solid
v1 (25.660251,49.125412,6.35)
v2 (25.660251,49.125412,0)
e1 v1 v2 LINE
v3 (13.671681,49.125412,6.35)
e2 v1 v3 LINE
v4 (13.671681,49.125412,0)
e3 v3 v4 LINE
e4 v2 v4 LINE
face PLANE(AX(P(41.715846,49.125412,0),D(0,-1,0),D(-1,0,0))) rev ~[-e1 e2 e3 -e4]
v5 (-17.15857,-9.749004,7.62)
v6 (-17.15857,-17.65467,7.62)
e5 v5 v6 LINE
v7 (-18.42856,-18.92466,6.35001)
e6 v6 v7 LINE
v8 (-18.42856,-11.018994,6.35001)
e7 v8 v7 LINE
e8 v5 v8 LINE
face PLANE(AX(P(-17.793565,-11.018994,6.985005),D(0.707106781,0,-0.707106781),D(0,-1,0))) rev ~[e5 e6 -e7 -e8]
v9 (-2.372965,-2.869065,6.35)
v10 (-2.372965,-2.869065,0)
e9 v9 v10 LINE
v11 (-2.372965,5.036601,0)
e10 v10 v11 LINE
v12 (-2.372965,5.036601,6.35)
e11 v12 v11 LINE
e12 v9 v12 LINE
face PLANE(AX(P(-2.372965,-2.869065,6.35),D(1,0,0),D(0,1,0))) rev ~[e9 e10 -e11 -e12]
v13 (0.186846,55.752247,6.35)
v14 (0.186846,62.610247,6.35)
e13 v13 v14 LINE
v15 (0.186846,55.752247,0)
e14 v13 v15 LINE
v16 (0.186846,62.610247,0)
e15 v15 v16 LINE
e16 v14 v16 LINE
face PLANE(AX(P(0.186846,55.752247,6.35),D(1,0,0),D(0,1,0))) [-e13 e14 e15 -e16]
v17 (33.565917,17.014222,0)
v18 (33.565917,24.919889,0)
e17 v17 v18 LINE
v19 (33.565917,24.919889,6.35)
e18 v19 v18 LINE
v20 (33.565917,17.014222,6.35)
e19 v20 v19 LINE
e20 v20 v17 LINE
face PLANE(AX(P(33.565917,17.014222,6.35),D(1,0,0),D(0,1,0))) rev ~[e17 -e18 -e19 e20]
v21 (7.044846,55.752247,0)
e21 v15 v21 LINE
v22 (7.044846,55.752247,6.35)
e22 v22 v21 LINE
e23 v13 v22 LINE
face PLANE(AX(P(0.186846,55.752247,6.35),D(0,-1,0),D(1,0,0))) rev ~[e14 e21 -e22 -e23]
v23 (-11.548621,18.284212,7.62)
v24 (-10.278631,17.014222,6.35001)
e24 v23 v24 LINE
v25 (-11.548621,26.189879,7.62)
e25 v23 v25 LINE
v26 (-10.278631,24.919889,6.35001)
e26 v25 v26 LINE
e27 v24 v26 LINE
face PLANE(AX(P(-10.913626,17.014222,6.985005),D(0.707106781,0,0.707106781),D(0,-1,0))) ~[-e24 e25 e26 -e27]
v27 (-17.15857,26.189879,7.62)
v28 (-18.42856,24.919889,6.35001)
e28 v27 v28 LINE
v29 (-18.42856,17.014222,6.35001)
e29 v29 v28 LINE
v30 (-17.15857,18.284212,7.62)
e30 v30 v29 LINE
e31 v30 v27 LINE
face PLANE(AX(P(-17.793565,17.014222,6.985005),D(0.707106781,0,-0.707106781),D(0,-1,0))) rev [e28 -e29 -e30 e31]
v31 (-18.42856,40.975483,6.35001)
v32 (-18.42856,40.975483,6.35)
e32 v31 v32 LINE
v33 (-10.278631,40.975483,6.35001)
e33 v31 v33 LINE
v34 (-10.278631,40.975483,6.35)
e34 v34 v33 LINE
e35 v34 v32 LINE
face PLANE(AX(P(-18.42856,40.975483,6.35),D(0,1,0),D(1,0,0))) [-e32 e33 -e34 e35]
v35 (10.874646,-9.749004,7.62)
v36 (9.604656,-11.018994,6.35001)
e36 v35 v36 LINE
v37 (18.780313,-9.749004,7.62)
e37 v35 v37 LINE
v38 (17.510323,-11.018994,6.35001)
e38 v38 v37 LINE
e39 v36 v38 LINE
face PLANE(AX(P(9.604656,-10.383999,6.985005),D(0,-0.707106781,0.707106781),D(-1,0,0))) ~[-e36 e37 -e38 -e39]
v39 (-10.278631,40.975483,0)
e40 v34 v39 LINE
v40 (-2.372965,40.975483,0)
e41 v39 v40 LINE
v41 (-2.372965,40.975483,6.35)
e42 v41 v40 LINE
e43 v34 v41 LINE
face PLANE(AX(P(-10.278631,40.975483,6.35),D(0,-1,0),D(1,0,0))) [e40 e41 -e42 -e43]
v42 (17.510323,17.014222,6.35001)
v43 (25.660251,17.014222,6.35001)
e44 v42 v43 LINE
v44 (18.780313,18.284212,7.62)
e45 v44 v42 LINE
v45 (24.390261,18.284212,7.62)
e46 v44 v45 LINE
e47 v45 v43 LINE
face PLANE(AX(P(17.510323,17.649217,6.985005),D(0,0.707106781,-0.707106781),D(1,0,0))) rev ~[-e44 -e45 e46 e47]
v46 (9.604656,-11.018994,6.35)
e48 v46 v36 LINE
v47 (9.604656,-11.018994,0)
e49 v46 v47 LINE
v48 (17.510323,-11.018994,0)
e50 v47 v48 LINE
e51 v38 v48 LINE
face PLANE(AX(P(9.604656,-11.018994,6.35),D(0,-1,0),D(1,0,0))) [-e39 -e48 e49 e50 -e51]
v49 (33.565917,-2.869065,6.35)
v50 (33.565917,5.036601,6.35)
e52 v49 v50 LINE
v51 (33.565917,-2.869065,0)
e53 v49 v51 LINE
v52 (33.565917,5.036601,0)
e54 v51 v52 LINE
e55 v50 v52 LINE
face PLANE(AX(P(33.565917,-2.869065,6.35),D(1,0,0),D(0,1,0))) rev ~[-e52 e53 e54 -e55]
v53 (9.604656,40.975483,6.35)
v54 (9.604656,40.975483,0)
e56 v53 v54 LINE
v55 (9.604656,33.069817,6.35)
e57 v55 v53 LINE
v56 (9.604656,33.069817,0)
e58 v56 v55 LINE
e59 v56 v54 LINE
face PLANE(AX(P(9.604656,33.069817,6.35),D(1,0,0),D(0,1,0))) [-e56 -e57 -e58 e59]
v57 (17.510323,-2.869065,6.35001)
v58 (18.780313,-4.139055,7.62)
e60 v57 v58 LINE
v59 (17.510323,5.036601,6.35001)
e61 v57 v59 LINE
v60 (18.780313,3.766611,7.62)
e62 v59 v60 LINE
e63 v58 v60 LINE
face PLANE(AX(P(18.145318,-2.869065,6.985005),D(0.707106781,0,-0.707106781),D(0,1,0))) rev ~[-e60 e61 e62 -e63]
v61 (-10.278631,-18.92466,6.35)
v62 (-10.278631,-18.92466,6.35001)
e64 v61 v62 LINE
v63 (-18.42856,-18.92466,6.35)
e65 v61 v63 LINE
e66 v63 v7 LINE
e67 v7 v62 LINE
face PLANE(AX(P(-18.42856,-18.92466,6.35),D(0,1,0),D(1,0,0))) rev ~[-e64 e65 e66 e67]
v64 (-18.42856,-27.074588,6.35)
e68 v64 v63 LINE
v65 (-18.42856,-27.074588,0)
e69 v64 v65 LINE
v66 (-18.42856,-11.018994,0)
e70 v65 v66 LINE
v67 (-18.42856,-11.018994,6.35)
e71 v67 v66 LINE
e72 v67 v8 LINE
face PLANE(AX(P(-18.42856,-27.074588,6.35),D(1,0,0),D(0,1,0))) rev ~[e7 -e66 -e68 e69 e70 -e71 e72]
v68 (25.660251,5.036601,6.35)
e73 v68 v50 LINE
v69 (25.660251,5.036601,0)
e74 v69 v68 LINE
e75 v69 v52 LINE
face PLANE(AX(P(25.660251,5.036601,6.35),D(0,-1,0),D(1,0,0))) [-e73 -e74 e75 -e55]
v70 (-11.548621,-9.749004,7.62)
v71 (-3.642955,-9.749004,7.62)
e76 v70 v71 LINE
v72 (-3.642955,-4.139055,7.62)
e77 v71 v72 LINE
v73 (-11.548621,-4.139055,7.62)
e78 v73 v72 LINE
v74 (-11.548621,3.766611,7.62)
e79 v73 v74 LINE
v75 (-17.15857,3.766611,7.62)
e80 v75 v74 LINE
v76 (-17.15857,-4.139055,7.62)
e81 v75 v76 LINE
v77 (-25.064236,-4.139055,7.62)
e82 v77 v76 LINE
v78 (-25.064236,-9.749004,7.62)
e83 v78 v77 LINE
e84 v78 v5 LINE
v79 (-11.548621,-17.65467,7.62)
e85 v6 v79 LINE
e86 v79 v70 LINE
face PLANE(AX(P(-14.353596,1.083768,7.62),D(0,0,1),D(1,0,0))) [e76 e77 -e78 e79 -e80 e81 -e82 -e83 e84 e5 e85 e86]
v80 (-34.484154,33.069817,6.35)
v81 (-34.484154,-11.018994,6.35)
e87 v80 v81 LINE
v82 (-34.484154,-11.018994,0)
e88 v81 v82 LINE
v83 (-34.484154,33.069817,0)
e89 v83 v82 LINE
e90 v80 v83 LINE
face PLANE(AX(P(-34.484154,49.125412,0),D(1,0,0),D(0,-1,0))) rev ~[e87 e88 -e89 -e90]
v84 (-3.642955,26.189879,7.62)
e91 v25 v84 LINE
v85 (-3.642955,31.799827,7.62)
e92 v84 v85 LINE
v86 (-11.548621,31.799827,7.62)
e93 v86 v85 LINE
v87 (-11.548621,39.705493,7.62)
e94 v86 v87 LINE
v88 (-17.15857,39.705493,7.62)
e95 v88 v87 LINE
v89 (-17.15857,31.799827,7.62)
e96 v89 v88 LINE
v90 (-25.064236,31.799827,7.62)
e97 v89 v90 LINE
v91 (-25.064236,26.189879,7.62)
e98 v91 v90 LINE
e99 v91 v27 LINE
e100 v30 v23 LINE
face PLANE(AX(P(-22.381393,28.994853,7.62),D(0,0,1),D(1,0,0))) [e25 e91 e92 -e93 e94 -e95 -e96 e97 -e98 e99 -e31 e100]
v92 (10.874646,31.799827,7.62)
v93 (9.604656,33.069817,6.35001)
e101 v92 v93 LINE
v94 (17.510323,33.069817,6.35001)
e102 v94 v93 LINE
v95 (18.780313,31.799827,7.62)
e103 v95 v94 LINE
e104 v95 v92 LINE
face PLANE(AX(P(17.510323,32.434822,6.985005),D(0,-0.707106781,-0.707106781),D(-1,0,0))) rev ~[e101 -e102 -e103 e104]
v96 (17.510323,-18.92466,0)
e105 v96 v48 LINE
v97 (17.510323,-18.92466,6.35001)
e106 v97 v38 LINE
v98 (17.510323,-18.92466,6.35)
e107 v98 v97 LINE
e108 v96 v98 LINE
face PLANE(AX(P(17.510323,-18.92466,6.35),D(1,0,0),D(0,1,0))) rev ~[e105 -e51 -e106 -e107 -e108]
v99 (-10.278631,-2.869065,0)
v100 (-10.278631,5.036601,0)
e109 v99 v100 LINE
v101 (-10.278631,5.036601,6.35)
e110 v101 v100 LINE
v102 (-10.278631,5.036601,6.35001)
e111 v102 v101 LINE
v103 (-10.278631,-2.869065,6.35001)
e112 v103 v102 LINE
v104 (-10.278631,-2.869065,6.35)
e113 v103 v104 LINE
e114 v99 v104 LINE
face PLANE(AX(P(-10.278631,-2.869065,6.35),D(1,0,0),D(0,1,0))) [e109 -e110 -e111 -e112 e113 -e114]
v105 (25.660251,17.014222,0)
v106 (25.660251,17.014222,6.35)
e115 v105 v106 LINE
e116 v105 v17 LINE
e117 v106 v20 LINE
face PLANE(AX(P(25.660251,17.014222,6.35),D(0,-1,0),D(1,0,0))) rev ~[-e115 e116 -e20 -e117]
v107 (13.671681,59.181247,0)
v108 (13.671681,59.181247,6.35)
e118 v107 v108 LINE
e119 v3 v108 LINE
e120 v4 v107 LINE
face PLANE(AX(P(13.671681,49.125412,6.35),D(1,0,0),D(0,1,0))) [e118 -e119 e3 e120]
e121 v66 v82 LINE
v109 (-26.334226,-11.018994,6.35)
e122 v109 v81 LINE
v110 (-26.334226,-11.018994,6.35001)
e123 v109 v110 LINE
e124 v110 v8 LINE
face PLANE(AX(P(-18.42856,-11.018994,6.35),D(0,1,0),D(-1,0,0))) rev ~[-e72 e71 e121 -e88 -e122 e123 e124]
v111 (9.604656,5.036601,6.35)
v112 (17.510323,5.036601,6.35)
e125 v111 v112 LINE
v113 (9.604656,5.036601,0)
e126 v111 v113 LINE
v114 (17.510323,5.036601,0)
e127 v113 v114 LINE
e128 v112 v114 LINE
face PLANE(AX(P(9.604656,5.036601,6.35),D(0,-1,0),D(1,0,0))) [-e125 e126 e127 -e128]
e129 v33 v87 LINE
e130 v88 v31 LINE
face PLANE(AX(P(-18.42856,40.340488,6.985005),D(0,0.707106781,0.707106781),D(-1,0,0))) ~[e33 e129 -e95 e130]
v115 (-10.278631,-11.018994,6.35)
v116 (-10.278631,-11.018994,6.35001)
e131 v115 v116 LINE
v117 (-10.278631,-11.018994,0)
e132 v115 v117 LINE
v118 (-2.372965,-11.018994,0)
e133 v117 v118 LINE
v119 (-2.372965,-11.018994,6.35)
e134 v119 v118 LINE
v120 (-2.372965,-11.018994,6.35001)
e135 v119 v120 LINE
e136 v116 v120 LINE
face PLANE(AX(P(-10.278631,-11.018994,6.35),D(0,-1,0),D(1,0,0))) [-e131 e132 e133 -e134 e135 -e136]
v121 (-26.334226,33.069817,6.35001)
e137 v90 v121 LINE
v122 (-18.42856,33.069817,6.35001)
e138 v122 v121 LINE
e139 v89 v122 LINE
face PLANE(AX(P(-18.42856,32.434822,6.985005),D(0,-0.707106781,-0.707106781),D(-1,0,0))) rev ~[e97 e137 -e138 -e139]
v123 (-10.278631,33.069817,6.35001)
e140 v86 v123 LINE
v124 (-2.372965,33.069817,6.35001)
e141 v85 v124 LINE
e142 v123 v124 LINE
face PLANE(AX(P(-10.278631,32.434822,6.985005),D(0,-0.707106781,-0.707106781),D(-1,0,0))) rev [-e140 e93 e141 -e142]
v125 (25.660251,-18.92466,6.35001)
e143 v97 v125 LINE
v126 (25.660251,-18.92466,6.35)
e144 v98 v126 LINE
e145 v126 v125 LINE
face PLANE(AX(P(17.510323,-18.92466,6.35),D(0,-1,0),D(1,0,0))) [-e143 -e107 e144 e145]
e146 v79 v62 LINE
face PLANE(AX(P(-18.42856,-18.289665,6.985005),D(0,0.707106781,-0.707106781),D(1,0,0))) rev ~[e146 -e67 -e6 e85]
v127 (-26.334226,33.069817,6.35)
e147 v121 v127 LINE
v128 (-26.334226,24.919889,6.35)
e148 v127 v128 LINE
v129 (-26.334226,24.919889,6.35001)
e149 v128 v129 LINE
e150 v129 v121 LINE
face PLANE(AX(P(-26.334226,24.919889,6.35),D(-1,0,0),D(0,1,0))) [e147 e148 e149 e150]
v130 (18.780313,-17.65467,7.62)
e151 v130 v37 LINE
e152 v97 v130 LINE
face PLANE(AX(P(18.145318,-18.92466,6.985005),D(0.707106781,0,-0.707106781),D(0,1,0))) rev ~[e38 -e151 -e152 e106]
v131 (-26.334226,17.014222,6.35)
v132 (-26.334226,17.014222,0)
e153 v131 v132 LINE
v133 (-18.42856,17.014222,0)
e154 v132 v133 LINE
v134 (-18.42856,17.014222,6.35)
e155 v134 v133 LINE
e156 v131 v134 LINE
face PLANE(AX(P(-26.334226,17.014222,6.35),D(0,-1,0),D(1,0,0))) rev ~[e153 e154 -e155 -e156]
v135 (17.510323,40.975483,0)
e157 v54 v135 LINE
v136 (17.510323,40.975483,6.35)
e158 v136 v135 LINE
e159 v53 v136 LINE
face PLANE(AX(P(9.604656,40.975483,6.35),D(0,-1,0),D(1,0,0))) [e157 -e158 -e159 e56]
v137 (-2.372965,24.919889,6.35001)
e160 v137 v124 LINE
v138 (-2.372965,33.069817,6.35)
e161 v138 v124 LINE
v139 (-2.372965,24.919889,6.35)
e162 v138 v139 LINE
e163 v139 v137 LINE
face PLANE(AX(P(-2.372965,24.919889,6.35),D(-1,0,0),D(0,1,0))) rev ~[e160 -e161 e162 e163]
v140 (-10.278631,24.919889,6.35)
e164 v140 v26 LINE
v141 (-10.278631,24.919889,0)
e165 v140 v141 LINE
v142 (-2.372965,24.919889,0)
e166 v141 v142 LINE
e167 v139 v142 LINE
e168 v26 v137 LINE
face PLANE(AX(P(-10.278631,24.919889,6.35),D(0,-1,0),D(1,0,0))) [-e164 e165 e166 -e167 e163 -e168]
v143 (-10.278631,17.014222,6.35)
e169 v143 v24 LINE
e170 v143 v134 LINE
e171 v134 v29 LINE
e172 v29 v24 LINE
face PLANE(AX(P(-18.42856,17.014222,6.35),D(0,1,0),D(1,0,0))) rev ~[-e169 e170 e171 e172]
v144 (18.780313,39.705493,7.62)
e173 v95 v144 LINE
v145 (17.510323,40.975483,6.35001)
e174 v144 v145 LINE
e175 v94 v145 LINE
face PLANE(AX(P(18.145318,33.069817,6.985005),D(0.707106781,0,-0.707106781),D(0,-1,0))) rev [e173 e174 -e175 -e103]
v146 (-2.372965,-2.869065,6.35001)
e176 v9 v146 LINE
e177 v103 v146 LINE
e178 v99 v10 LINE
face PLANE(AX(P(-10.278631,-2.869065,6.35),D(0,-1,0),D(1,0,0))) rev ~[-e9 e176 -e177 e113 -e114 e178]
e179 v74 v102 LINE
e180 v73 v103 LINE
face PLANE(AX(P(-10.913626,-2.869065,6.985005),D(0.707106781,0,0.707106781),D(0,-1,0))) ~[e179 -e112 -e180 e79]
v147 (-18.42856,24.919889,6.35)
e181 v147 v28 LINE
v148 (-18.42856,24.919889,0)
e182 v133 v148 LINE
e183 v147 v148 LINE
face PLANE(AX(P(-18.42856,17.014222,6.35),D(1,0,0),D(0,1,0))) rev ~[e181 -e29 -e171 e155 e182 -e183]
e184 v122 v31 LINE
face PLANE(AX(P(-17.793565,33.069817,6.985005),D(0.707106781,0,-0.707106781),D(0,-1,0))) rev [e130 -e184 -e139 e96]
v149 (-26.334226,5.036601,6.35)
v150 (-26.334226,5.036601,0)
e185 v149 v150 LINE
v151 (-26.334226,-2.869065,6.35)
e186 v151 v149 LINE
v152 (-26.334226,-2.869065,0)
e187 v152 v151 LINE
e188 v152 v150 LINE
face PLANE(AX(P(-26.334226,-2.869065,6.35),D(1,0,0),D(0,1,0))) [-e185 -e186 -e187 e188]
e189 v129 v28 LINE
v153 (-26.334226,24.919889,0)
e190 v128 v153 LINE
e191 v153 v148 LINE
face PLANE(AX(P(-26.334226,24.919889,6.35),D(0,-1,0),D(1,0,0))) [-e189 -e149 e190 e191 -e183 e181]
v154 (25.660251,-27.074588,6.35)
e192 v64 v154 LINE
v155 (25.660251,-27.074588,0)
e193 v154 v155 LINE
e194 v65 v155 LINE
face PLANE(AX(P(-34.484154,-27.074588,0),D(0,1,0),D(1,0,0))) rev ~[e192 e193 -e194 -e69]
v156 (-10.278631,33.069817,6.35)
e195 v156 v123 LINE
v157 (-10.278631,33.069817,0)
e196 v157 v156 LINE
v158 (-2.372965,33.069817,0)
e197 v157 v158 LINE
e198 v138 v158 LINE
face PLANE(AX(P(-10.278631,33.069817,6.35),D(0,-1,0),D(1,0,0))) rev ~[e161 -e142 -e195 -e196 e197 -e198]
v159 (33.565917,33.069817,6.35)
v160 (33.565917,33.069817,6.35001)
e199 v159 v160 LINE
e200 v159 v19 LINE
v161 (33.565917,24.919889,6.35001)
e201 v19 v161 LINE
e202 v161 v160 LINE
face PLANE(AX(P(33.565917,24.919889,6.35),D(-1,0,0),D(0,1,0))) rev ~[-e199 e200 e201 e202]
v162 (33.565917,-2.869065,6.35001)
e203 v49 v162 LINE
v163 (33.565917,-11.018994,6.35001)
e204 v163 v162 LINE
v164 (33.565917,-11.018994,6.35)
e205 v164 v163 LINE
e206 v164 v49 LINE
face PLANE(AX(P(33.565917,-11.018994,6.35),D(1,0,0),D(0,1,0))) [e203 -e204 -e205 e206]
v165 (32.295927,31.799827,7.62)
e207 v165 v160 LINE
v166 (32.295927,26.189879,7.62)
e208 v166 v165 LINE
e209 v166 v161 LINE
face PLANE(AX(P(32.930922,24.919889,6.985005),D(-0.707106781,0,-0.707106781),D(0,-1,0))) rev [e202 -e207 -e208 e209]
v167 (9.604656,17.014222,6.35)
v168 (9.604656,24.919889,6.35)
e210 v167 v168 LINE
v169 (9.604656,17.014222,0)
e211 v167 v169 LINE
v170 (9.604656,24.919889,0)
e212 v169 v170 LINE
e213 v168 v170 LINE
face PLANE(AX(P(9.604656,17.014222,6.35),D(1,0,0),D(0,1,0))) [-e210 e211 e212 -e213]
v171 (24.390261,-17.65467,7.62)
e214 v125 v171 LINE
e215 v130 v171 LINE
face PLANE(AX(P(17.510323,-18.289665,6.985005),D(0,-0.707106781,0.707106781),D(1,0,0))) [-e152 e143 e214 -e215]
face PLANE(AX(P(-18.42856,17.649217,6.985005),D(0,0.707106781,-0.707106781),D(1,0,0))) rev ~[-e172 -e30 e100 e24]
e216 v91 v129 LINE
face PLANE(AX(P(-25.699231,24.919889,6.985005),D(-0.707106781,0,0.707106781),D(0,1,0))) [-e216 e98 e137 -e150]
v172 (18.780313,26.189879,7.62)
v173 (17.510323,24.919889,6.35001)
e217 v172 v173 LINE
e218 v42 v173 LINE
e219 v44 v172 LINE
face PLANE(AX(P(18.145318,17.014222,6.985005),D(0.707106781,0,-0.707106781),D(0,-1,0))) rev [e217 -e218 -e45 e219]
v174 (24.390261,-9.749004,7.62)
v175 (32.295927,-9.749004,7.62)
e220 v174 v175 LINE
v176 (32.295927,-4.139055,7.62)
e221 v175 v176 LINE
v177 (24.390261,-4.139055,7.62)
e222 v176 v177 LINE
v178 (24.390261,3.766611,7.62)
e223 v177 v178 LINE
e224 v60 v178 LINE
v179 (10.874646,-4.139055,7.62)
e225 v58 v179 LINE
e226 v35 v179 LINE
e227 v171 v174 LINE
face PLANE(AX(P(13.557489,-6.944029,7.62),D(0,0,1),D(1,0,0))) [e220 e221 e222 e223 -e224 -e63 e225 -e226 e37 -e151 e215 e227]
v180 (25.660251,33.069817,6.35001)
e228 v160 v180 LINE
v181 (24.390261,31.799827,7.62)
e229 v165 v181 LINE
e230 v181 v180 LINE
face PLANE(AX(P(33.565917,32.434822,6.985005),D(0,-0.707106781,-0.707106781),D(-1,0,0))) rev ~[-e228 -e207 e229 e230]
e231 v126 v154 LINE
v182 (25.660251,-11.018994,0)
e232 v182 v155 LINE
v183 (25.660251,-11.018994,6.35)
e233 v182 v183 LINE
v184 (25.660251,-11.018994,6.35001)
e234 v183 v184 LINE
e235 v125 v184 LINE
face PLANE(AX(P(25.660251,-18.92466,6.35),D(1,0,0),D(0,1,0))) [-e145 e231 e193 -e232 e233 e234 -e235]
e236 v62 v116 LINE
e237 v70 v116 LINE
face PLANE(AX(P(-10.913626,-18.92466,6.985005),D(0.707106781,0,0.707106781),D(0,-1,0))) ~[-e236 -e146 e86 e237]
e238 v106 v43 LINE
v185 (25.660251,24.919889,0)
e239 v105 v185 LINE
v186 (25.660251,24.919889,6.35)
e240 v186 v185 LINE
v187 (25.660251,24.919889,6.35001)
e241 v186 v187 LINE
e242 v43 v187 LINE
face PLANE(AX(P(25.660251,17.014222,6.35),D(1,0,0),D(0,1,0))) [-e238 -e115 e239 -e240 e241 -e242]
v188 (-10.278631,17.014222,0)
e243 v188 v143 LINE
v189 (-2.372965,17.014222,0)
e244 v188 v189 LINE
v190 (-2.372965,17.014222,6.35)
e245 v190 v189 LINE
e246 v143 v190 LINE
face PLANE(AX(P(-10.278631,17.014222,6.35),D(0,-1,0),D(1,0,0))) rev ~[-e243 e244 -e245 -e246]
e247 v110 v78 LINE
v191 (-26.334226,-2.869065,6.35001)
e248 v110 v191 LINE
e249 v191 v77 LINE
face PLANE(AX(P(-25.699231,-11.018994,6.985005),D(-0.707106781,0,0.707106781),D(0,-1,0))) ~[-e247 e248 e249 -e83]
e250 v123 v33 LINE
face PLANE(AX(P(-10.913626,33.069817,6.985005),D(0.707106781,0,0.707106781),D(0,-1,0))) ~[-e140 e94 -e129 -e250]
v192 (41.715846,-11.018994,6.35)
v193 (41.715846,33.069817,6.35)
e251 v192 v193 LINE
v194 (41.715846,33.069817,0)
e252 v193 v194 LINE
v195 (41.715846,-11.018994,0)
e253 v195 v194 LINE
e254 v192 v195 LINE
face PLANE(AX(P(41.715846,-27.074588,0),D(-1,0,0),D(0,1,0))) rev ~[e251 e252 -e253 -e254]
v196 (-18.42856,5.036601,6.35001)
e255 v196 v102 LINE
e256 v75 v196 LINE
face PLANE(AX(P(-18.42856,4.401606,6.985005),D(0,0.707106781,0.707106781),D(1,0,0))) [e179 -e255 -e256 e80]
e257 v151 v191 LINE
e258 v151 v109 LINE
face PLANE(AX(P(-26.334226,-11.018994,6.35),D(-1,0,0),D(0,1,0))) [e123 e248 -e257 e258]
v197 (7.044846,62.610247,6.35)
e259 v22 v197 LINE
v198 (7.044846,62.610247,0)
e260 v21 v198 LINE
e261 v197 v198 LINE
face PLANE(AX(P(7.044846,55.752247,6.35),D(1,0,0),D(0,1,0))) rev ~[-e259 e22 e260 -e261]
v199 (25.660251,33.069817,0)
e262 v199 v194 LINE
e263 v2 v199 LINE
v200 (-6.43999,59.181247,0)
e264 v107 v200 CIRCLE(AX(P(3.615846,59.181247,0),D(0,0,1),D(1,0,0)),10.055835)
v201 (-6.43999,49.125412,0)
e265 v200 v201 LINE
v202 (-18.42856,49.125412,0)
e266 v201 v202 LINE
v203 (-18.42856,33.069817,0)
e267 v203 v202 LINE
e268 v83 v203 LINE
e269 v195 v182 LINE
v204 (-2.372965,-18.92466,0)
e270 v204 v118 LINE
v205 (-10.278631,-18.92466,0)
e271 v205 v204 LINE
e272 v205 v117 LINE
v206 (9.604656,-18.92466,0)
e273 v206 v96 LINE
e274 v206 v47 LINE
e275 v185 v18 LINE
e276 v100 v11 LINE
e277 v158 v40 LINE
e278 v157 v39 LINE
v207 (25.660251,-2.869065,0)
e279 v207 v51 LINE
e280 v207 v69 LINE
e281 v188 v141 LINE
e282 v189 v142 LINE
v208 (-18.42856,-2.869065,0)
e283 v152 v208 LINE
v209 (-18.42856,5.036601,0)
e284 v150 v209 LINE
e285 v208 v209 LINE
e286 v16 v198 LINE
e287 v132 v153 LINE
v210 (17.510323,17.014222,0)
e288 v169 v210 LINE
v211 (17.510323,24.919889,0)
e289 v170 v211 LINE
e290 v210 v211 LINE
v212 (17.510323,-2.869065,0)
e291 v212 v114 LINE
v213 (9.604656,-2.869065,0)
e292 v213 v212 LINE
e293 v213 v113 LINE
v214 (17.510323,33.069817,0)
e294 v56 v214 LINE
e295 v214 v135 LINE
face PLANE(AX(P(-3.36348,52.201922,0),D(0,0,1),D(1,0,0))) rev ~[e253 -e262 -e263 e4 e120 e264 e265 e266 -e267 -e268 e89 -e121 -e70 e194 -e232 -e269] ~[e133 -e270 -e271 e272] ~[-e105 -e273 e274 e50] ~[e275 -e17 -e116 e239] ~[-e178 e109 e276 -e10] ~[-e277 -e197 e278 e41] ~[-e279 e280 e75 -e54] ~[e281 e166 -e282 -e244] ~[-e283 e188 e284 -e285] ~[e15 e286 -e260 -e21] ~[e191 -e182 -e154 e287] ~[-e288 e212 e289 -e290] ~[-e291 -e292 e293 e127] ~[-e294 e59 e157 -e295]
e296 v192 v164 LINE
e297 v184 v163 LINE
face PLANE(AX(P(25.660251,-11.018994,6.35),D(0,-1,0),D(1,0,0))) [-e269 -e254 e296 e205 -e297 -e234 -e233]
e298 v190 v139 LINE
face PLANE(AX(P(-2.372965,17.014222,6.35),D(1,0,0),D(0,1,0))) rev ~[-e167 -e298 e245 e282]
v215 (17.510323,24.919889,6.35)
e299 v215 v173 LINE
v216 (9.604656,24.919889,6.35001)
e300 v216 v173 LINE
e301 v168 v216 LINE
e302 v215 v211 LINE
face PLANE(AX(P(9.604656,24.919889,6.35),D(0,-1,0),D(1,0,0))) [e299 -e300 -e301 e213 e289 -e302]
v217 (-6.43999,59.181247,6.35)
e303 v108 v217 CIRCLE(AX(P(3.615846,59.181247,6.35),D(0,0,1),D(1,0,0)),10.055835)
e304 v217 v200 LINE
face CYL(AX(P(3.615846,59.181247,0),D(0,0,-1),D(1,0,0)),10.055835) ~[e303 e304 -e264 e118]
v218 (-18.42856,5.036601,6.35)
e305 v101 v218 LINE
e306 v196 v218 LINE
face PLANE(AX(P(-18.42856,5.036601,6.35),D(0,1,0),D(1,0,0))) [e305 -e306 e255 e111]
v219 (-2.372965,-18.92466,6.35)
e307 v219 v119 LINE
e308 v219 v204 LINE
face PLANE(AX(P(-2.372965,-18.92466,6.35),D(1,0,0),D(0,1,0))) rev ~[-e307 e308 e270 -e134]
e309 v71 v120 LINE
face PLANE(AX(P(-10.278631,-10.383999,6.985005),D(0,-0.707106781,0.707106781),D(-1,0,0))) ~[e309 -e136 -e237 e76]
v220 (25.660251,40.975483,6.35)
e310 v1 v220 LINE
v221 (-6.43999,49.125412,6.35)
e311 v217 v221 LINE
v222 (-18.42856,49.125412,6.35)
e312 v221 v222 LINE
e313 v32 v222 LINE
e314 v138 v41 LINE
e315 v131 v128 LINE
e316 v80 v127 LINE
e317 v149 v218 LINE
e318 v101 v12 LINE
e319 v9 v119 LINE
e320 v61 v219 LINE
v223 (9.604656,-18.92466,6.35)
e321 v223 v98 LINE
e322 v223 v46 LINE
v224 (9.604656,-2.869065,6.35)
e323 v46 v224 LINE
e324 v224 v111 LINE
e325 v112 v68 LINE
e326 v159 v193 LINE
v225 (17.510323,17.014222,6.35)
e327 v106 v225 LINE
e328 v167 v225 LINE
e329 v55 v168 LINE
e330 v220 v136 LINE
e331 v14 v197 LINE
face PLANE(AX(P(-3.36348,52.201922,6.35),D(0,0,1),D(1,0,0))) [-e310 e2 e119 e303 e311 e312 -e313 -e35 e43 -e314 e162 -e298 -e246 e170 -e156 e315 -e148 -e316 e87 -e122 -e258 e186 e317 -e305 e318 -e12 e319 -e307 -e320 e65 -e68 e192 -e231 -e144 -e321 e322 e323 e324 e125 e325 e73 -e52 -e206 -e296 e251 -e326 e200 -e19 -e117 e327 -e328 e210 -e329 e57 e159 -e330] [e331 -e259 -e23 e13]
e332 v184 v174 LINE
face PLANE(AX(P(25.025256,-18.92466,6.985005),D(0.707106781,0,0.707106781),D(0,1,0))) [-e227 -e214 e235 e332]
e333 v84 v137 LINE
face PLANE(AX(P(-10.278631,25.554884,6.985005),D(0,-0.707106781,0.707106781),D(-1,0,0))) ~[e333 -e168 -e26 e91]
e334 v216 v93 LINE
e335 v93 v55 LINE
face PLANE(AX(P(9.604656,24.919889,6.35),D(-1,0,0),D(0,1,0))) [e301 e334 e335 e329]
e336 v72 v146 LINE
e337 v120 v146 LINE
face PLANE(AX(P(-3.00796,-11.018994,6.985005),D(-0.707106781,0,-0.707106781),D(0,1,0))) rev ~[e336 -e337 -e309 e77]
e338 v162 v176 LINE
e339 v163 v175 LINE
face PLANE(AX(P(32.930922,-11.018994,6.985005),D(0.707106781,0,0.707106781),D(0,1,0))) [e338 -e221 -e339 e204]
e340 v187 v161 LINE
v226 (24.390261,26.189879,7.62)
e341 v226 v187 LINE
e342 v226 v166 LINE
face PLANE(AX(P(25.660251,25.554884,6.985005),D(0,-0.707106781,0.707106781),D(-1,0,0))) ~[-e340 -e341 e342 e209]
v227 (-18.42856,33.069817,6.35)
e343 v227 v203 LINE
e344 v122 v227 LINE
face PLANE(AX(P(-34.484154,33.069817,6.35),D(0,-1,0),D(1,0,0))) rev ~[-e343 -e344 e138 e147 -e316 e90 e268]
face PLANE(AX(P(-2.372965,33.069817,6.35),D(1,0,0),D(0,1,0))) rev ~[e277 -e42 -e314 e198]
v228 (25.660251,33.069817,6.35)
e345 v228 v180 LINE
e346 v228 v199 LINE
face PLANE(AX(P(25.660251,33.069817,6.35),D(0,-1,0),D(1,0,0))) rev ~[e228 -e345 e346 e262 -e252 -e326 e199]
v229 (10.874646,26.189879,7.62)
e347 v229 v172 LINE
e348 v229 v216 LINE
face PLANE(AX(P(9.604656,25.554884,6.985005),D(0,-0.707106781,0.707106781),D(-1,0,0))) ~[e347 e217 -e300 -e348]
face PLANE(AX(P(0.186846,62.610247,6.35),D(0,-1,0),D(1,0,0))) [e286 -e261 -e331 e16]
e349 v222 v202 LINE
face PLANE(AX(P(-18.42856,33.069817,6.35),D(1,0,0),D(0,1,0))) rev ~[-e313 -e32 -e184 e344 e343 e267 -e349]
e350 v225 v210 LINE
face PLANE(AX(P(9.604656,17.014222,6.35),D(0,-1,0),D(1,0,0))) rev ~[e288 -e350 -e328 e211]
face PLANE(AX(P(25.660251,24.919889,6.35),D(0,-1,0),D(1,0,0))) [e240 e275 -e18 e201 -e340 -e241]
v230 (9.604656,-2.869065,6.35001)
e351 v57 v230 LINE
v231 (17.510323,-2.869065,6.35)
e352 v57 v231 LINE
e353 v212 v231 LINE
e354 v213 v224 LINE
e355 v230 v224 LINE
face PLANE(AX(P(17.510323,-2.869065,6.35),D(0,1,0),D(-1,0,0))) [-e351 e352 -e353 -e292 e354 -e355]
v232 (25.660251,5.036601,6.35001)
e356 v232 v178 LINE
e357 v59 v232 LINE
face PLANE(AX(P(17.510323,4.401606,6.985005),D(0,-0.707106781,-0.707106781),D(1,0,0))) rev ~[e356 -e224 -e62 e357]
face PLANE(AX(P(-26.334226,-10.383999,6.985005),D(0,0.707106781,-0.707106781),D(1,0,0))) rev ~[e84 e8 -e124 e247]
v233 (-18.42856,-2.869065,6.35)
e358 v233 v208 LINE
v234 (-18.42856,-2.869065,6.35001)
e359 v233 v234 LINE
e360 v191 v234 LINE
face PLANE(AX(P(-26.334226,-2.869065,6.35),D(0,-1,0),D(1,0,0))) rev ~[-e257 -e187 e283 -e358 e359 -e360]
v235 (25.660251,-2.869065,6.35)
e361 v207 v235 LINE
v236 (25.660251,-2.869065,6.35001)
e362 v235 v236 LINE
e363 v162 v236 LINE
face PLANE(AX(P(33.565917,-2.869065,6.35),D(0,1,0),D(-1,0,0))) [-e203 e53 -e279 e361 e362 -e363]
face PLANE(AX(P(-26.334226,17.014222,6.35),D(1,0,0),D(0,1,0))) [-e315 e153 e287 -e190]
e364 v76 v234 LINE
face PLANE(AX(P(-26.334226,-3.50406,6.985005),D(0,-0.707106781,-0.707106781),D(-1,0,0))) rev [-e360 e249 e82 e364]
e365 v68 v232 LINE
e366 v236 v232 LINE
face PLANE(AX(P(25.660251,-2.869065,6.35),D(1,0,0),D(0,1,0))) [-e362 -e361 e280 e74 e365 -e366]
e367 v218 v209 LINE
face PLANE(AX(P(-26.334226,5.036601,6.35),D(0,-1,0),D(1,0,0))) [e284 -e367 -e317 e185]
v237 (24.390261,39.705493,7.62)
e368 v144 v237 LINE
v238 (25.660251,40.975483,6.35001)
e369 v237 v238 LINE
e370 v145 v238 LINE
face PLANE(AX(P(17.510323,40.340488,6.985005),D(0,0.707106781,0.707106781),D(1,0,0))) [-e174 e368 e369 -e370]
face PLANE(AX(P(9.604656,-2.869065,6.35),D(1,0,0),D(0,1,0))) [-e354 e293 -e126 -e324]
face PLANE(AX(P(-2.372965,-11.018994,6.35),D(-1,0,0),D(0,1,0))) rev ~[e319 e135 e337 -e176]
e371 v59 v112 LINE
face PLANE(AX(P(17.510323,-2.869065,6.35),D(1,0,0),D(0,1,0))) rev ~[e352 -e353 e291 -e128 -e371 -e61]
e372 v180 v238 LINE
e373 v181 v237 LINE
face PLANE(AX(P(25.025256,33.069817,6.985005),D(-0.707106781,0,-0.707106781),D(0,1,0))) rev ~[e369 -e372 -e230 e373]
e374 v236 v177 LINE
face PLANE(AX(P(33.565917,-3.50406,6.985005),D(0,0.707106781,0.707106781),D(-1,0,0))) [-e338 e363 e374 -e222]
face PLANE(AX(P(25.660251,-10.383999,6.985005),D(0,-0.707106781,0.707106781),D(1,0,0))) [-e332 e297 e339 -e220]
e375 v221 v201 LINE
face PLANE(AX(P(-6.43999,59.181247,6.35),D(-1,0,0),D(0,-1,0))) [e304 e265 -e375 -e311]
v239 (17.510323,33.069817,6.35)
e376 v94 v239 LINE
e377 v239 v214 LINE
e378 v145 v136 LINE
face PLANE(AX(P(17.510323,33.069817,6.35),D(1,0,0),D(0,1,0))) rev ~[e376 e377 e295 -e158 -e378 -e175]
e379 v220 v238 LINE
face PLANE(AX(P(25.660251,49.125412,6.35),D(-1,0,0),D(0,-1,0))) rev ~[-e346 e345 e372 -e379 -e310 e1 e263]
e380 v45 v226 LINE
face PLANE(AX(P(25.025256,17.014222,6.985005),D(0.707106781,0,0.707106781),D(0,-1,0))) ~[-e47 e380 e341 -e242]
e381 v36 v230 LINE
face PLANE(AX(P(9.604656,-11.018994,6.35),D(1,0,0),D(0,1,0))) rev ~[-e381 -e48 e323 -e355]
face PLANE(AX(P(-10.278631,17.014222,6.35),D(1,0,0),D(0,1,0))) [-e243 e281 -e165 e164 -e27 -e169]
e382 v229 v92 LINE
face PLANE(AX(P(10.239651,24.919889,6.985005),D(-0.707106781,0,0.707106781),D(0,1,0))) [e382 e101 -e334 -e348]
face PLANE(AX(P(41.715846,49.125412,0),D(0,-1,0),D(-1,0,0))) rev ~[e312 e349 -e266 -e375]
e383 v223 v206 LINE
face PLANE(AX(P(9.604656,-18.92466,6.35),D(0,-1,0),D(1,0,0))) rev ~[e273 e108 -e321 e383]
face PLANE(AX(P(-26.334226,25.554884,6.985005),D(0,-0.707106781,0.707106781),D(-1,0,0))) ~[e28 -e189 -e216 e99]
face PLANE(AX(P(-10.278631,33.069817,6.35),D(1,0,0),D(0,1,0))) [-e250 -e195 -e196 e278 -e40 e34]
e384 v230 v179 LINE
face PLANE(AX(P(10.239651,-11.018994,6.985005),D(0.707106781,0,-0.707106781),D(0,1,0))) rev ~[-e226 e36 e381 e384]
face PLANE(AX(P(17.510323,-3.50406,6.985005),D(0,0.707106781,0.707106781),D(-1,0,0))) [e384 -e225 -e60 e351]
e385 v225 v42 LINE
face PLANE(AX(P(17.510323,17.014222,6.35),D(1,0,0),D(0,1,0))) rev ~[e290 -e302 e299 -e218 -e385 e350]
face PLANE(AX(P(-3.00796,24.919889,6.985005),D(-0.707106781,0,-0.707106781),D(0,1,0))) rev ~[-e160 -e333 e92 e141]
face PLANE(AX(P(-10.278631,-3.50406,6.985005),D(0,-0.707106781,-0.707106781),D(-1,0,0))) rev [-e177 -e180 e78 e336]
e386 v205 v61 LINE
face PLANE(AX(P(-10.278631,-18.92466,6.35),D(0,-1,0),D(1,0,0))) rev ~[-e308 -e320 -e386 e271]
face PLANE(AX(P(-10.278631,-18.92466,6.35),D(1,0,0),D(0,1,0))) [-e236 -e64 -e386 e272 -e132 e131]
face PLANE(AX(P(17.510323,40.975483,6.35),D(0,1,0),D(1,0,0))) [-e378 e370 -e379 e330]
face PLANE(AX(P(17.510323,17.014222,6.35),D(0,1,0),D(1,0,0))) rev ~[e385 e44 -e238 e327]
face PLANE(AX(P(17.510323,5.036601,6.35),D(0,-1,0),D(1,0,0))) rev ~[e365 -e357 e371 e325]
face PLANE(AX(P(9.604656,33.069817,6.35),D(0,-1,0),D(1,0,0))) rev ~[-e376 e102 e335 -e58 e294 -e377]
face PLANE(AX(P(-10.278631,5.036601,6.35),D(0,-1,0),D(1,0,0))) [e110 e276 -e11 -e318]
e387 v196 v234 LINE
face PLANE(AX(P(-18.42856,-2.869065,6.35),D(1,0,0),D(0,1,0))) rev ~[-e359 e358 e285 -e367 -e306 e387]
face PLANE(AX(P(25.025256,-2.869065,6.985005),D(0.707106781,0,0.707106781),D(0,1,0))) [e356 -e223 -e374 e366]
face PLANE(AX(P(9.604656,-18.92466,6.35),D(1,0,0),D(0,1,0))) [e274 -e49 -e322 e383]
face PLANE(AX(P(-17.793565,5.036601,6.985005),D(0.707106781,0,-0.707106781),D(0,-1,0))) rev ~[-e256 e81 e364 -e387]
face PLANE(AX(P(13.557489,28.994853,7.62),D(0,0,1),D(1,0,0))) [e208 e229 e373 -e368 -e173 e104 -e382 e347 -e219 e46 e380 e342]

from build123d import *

# Parameters (mm, degrees)
F1_DEPTH  = 6.35
F2_W      = 7.9056663411
F2_H      = 7.9056663411
F3_DEPTH  = 25.4
F4_W      = 6.858
F4_H      = 6.858
F5_DEPTH  = 25.4
F6_W      = 7.9056663411
F6_H      = 8.1499283314
F6_W_2    = 8.1499283314
F6_H_2    = 7.9056663411
F7_DEPTH  = 1.27
F8_SIZE   = 1.26999
F10_DEPTH = 6.35


# Not quite as in the source:
# - a fillet or chamfer is up to 0.001 mm smaller than in the source, because OpenCascade refuses the exact size
# - a feature names something its author has since deleted; it is built from what else it names


with BuildPart() as f1:
    # F0 (on Top) → F1 (new body)
    with BuildSketch(Plane.XY):
        with BuildLine():
            ThreePointArc((13.6716806904, 59.1812469065), (-3.4947036843, 66.2917961397), (3.6158455206, 49.1254117533))
            ThreePointArc((3.6158455206, 49.1254117533), (10.7263947587, 52.0706976733), (13.6716806904, 59.1812469065))
        make_face()
    extrude(amount=F1_DEPTH)

    # F4 (on face) → F5 (cut)
    with BuildSketch(Plane.XY.offset(6.35)):
        with Locations((3.6158455372, 59.1812469065)):
            Rectangle(F4_W, F4_H)
    extrude(amount=-F5_DEPTH, mode=Mode.SUBTRACT)



with BuildPart() as f1b:
    # F0 (on Top) → F1, piece 2 (new body)
    with BuildSketch(Plane.XY):
        Polygon((3.6158455206, 49.1254117533), (-34.4841544628, 49.1254117533), (-34.4841544628, -27.0745882467), (41.7158455372, -27.0745882467), (41.7158455372, 49.1254117533), align=None)
    extrude(amount=F1_DEPTH)

    # F2 (on face) → F3 (cut)
    with BuildSketch(Plane.XY.offset(6.35)):
        Polygon((-34.4841544628, 33.0698170808), (-26.3342261314, 33.0698170808), (-18.4285597903, 33.0698170808), (-18.4285597903, 40.9754834219), (-18.4285597903, 49.1254117533), (-34.4841544628, 49.1254117533), align=None)
        Polygon((25.6602508647, 40.9754834219), (25.6602508647, 33.0698170808), (33.5659172058, 33.0698170808), (41.7158455372, 33.0698170808), (41.7158455372, 49.1254117533), (25.6602508647, 49.1254117533), align=None)
        Polygon((33.5659172058, -11.0189935742), (25.6602508647, -11.0189935742), (25.6602508647, -18.9246599153), (25.6602508647, -27.0745882467), (41.7158455372, -27.0745882467), (41.7158455372, -11.0189935742), align=None)
        Polygon((-18.4285597903, -18.9246599153), (-18.4285597903, -11.0189935742), (-26.3342261314, -11.0189935742), (-34.4841544628, -11.0189935742), (-34.4841544628, -27.0745882467), (-18.4285597903, -27.0745882467), align=None)
        with Locations((-22.3813929609, 1.0837679277)):
            Rectangle(F2_W, F2_H)
        with Locations((-22.3813929609, 20.9670555789)):
            Rectangle(F2_W, F2_H)
        with Locations((-6.3257982884, 37.0226502514)):
            Rectangle(F2_W, F2_H)
        with Locations((-6.3257982884, 20.9670555789)):
            Rectangle(F2_W, F2_H)
        with Locations((-6.3257982884, 1.0837679277)):
            Rectangle(F2_W, F2_H)
        with Locations((-6.3257982884, -14.9718267448)):
            Rectangle(F2_W, F2_H)
        with Locations((13.5574893628, -14.9718267448)):
            Rectangle(F2_W, F2_H)
        with Locations((13.5574893628, 1.0837679277)):
            Rectangle(F2_W, F2_H)
        with Locations((29.6130840353, 1.0837679277)):
            Rectangle(F2_W, F2_H)
        with Locations((29.6130840353, 20.9670555789)):
            Rectangle(F2_W, F2_H)
        with Locations((13.5574893628, 20.9670555789)):
            Rectangle(F2_W, F2_H)
        with Locations((13.5574893628, 37.0226502514)):
            Rectangle(F2_W, F2_H)
    extrude(amount=-F3_DEPTH, mode=Mode.SUBTRACT)

    # F6 (on face) → F7 (join, symmetric)
    with BuildSketch(Plane.XY.offset(6.35)):
        with Locations((-22.3813929609, 28.9948529151)):
            Rectangle(F6_W, F6_H)
        with Locations((-14.3535956246, 28.9948529151)):
            Rectangle(F6_W_2, F6_H)
        with Locations((-14.3535956246, 37.0226502514)):
            Rectangle(F6_W_2, F6_H_2)
        with Locations((-6.3257982884, 28.9948529151)):
            Rectangle(F6_W, F6_H)
        with Locations((-14.3535956246, 20.9670555789)):
            Rectangle(F6_W_2, F6_H_2)
        with Locations((13.5574893628, 28.9948529151)):
            Rectangle(F6_W, F6_H)
        with Locations((29.6130840353, 28.9948529151)):
            Rectangle(F6_W, F6_H)
        with Locations((21.585286699, 28.9948529151)):
            Rectangle(F6_W_2, F6_H)
        with Locations((21.585286699, 37.0226502514)):
            Rectangle(F6_W_2, F6_H_2)
        with Locations((21.585286699, 20.9670555789)):
            Rectangle(F6_W_2, F6_H_2)
        with Locations((-14.3535956246, 1.0837679277)):
            Rectangle(F6_W_2, F6_H_2)
        with Locations((-14.3535956246, -6.9440294085)):
            Rectangle(F6_W_2, F6_H)
        with Locations((-14.3535956246, -14.9718267448)):
            Rectangle(F6_W_2, F6_H_2)
        with Locations((-22.3813929609, -6.9440294085)):
            Rectangle(F6_W, F6_H)
        with Locations((-6.3257982884, -6.9440294085)):
            Rectangle(F6_W, F6_H)
        with Locations((13.5574893628, -6.9440294085)):
            Rectangle(F6_W, F6_H)
        with Locations((21.585286699, -6.9440294085)):
            Rectangle(F6_W_2, F6_H)
        with Locations((29.6130840353, -6.9440294085)):
            Rectangle(F6_W, F6_H)
        with Locations((21.585286699, -14.9718267448)):
            Rectangle(F6_W_2, F6_H_2)
        with Locations((21.585286699, 1.0837679277)):
            Rectangle(F6_W_2, F6_H_2)
    extrude(amount=F7_DEPTH, both=True)

    # F8 (size 1.27 in the source; OpenCascade refuses exactly that, so slightly less here)
    f8_edges = [f1b.edges().sort_by_distance(p)[0] for p in [
        (-22.381393, 33.069817, 7.62),
        (-18.42856, 37.02265, 7.62),
        (-14.353596, 40.975483, 7.62),
        (-10.278631, 37.02265, 7.62),
        (-6.325798, 33.069817, 7.62),
        (-2.372965, 28.994853, 7.62),
        (-6.325798, 24.919889, 7.62),
        (-10.278631, 20.967056, 7.62),
        (-14.353596, 17.014222, 7.62),
        (-18.42856, 20.967056, 7.62),
        (-22.381393, 24.919889, 7.62),
        (-26.334226, 28.994853, 7.62),
        (-10.278631, 1.083768, 7.62),
        (-6.325798, -2.869065, 7.62),
        (-2.372965, -6.944029, 7.62),
        (-6.325798, -11.018994, 7.62),
        (-14.353596, -18.92466, 7.62),
        (-26.334226, -6.944029, 7.62),
        (-22.381393, -11.018994, 7.62),
        (-18.42856, -14.971827, 7.62),
        (-22.381393, -2.869065, 7.62),
        (-18.42856, 1.083768, 7.62),
        (-14.353596, 5.036601, 7.62),
        (-10.278631, -14.971827, 7.62),
        (25.660251, 1.083768, 7.62),
        (25.660251, -14.971827, 7.62),
        (21.585287, -18.92466, 7.62),
        (17.510323, -14.971827, 7.62),
        (13.557489, -11.018994, 7.62),
        (9.604656, -6.944029, 7.62),
        (13.557489, -2.869065, 7.62),
        (17.510323, 1.083768, 7.62),
        (21.585287, 5.036601, 7.62),
        (29.613084, -2.869065, 7.62),
        (29.613084, -11.018994, 7.62),
        (33.565917, -6.944029, 7.62),
        (29.613084, 33.069817, 7.62),
        (25.660251, 37.02265, 7.62),
        (21.585287, 40.975483, 7.62),
        (17.510323, 37.02265, 7.62),
        (13.557489, 33.069817, 7.62),
        (9.604656, 28.994853, 7.62),
        (17.510323, 20.967056, 7.62),
        (13.557489, 24.919889, 7.62),
        (21.585287, 17.014222, 7.62),
        (29.613084, 24.919889, 7.62),
        (33.565917, 28.994853, 7.62),
        (25.660251, 20.967056, 7.62),
    ]]
    chamfer(f8_edges, length=F8_SIZE)


with BuildPart() as f1_1:
    add(f1.part)

    add(f1b.part)  # F10 merges F1b
    # F9 (on face) → F10 (join)
    with BuildSketch(Plane.XY.offset(6.35)):
        with BuildLine():
            Line((-6.439989616, 49.1254117533), (3.6158455372, 49.1254117533))
            ThreePointArc((3.6158455372, 49.1254117533), (-3.4947036902, 52.0706976792), (-6.439989616, 59.1812469065))
            Line((-6.439989616, 59.1812469065), (-6.439989616, 49.1254117533))
        make_face()
        with BuildLine():
            Line((3.6158455372, 49.1254117533), (13.6716806904, 49.1254117533))
            Line((13.6716806904, 49.1254117533), (13.6716806904, 59.1812469065))
            ThreePointArc((13.6716806904, 59.1812469065), (10.7263947645, 52.0706976792), (3.6158455372, 49.1254117533))
        make_face()
    extrude(amount=-F10_DEPTH)


solid = f1_1.part
